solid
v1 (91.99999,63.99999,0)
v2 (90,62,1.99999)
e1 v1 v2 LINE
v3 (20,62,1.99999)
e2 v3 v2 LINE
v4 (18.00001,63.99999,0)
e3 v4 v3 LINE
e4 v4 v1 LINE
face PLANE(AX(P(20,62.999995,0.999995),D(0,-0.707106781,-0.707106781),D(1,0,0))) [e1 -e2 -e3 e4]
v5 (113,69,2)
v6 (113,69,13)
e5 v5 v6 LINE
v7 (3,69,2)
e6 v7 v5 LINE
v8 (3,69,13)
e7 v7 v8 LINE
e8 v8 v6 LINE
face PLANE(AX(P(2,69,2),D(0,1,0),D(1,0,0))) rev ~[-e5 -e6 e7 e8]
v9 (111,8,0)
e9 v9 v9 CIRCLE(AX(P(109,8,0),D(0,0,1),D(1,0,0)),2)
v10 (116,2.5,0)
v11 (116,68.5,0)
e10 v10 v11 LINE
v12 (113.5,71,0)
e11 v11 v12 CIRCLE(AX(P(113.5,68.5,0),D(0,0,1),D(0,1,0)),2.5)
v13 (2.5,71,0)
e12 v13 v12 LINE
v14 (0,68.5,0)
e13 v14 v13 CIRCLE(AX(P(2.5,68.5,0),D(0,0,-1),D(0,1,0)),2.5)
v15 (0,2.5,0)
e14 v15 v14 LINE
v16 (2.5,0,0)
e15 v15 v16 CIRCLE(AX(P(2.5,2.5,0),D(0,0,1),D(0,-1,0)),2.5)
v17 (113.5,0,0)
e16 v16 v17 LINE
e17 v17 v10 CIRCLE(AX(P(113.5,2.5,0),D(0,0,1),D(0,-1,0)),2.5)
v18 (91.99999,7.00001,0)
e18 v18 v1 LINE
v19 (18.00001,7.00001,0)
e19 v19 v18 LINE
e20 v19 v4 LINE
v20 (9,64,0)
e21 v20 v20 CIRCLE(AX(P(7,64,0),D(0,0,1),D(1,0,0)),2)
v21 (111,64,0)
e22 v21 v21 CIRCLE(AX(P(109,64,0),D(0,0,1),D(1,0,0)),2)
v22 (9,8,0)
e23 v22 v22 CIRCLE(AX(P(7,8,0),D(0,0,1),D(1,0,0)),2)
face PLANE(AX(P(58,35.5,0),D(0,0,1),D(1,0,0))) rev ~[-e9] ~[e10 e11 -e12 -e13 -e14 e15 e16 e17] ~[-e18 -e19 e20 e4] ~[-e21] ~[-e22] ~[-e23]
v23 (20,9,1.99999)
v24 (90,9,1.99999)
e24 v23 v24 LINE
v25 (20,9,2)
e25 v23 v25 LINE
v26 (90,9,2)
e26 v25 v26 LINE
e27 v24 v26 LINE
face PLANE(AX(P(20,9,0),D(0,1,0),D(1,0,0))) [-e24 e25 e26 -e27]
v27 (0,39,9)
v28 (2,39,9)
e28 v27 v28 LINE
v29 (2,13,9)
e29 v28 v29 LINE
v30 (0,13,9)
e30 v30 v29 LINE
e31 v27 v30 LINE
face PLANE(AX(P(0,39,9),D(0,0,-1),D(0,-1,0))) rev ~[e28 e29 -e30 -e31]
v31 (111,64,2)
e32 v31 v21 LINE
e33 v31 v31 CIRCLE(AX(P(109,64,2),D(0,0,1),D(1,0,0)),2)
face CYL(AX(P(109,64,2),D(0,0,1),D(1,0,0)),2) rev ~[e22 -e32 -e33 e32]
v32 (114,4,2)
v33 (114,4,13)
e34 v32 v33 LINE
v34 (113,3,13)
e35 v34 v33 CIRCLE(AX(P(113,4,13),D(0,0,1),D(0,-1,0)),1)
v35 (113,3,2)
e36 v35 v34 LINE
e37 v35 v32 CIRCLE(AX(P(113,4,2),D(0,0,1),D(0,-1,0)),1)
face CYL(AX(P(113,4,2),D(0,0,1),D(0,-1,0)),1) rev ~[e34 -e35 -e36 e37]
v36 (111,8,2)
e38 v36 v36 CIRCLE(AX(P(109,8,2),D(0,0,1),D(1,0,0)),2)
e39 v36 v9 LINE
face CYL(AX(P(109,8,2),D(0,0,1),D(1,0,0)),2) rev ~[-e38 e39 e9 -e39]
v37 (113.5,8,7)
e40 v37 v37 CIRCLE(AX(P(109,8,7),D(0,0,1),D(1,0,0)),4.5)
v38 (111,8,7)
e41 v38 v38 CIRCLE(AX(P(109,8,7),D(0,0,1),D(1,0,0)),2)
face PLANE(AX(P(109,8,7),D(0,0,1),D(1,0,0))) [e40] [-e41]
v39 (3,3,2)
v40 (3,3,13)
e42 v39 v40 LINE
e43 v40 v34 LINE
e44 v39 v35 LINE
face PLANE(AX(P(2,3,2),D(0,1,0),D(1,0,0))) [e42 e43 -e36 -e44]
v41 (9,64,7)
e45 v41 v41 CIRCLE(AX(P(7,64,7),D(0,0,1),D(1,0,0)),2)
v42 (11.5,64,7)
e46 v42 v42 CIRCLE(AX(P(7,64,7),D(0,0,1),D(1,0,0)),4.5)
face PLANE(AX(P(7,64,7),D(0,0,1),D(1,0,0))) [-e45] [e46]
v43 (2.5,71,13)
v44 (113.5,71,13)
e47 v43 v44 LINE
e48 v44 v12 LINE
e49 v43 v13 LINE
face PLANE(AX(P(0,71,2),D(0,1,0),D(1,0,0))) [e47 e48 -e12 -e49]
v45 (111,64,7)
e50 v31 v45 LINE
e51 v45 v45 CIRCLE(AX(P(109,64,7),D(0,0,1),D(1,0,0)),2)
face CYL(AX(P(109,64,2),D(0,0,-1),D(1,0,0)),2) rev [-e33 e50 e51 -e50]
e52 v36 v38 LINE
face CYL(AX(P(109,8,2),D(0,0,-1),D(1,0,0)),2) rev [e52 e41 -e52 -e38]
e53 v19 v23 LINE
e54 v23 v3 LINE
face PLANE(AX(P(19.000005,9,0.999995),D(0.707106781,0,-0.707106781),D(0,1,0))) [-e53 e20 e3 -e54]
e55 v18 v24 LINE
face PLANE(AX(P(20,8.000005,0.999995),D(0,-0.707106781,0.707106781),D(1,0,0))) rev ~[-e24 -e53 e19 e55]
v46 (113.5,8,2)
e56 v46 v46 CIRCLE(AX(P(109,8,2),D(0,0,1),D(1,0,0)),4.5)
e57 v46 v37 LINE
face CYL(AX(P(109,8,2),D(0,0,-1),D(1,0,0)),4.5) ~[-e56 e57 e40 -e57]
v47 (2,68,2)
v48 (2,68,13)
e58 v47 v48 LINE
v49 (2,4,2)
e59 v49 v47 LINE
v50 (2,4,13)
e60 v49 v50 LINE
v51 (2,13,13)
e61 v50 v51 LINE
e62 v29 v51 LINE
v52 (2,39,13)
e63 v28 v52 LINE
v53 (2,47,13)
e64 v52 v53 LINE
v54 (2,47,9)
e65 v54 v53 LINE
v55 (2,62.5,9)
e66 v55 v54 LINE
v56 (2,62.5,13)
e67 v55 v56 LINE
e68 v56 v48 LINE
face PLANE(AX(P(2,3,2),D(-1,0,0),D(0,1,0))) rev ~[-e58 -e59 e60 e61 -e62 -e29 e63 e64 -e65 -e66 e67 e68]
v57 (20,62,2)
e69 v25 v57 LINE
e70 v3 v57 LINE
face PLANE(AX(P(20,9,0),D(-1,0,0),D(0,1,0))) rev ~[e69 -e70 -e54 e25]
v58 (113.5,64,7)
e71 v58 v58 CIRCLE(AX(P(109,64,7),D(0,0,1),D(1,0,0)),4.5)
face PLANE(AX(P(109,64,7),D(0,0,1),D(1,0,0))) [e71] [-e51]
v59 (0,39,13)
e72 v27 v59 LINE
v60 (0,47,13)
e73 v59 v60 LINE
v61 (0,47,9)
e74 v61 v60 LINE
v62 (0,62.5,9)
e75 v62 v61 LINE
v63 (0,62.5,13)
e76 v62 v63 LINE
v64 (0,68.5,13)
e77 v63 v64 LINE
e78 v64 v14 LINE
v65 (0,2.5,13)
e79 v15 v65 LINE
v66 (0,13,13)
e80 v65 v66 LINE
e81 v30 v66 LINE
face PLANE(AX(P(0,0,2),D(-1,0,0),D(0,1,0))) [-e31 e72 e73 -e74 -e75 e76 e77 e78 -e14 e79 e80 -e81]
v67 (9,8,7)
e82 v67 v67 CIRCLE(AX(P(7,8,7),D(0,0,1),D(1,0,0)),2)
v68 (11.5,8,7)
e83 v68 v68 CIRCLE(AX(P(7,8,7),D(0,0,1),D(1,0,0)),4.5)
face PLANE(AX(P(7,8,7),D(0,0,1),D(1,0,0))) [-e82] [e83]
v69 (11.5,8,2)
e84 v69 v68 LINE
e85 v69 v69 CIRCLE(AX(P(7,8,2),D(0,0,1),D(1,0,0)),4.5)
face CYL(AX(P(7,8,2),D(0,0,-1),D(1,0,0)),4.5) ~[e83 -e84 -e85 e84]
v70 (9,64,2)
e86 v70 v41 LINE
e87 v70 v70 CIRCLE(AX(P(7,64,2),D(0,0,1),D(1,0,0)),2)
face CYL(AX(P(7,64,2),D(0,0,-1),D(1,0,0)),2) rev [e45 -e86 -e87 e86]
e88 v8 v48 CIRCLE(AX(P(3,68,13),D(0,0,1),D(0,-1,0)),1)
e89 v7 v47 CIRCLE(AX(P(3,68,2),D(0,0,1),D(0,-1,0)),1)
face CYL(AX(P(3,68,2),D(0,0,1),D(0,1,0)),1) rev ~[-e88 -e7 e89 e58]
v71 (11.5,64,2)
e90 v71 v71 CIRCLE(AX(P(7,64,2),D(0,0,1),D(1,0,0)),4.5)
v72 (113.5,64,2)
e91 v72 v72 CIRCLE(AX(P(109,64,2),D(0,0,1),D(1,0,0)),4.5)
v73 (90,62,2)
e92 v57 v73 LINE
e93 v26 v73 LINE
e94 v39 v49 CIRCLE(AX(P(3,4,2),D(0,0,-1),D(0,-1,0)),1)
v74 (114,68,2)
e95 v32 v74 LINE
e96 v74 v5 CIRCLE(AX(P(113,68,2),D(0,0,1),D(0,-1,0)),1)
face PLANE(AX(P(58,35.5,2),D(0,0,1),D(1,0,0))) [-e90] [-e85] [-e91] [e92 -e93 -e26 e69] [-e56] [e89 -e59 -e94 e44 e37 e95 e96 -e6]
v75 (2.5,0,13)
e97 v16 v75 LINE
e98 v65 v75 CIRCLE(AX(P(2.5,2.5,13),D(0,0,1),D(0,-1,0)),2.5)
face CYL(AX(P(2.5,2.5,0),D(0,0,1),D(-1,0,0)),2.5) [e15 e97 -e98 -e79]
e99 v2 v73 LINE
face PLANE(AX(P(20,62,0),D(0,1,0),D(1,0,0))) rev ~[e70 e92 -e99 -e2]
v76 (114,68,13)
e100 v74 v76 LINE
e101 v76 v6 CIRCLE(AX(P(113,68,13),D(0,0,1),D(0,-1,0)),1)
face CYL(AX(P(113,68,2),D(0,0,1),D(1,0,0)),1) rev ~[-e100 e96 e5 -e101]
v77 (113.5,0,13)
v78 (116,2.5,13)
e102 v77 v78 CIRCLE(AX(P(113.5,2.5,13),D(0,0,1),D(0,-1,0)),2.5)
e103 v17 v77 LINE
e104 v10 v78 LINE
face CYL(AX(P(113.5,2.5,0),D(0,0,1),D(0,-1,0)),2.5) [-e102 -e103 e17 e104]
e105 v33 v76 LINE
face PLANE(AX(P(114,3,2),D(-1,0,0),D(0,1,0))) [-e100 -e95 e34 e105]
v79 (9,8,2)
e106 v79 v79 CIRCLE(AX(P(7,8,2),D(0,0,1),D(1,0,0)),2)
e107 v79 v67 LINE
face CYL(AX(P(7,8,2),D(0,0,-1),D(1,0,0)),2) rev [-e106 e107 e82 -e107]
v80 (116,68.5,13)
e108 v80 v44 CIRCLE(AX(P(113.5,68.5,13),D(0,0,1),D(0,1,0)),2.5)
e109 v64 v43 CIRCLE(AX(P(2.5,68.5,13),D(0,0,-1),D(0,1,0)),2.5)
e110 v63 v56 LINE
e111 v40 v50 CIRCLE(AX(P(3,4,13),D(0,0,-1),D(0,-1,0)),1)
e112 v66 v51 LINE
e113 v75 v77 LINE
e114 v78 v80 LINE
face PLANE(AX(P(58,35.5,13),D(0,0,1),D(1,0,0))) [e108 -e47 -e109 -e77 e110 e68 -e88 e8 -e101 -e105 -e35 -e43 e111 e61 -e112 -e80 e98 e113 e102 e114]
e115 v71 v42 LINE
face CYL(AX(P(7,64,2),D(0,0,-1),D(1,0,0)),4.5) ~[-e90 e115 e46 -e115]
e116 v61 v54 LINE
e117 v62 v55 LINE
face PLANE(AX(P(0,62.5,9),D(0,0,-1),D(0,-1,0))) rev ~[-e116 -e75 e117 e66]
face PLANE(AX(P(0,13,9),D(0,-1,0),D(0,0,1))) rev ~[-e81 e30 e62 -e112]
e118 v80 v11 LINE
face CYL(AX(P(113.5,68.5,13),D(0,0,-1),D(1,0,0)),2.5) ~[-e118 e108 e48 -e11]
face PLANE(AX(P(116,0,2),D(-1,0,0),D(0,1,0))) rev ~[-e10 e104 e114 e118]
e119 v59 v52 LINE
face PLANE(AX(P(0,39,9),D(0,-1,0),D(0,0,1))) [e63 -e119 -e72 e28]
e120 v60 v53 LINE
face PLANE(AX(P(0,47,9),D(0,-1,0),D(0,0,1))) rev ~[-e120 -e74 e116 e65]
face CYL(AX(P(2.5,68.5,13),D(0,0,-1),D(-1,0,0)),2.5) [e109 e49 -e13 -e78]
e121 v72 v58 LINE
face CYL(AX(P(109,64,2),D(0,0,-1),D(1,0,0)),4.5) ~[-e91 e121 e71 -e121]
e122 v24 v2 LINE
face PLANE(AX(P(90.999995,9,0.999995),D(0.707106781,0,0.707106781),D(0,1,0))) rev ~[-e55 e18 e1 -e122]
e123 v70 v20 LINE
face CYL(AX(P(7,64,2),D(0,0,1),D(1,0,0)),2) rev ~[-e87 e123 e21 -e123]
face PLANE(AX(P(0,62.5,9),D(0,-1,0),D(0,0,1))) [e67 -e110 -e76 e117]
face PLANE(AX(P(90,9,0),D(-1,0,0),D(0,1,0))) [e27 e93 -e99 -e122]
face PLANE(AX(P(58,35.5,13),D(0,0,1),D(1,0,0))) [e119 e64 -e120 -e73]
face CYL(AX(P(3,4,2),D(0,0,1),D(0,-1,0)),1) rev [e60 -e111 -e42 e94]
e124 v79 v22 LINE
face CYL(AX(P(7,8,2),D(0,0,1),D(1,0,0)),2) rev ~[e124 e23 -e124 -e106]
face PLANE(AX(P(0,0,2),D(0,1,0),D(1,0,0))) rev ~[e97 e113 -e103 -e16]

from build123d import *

# Parameters (mm, degrees)
F0_W      = 116
F0_H      = 71
F0_W_2    = 70
F0_H_2    = 53
F1_DEPTH  = 2
F2_W      = 116
F2_H      = 71
F2_W_2    = 112
F2_H_2    = 66
F3_DEPTH  = 11
F4_R      = 2.5
F5_R      = 1
F6_R      = 4.5
F6_R_2    = 2
F7_DEPTH  = 5
F8_SIZE   = 1.99999
F9_W      = 15.5
F9_H      = 7.5
F9_W_2    = 26
F9_H_2    = 4
F10_DEPTH = 25
F11_DEPTH = 25


# Not quite as in the source:
# - a fillet or chamfer is up to 0.001 mm smaller than in the source, because OpenCascade refuses the exact size


with BuildPart() as f1:
    # F0 (on Top) → F1 (new body)
    with BuildSketch(Plane.XY):
        with Locations((58, 35.5)):
            Rectangle(F0_W, F0_H)
        with Locations((55, 35.5)):
            Rectangle(F0_W_2, F0_H_2, mode=Mode.SUBTRACT)
    extrude(amount=F1_DEPTH)

    # F2 (on face) → F3 (join)
    with BuildSketch(Plane.XY.offset(2)):
        with Locations((58, 35.5)):
            Rectangle(F2_W, F2_H)
        with Locations((58, 36)):
            Rectangle(F2_W_2, F2_H_2, mode=Mode.SUBTRACT)
    extrude(amount=F3_DEPTH)

    # F4
    f4_edges = [f1.edges().sort_by_distance(p)[0] for p in [
        (0, 0, 6.5),
        (116, 0, 6.5),
        (0, 71, 6.5),
        (116, 71, 6.5),
    ]]
    fillet(f4_edges, radius=F4_R)

    # F5
    f5_edges = [f1.edges().sort_by_distance(p)[0] for p in [
        (114, 3, 7.5),
        (2, 3, 7.5),
        (2, 69, 7.5),
        (114, 69, 7.5),
    ]]
    fillet(f5_edges, radius=F5_R)

    # F6 (on face) → F7 (join)
    with BuildSketch(Plane.XY.offset(2)):
        with Locations((7, 64)):
            Circle(F6_R)
        with Locations((7, 64)):
            Circle(F6_R_2, mode=Mode.SUBTRACT)
        with Locations((7, 8)):
            Circle(F6_R)
        with Locations((7, 8)):
            Circle(F6_R_2, mode=Mode.SUBTRACT)
        with Locations((109, 8)):
            Circle(F6_R)
        with Locations((109, 8)):
            Circle(F6_R_2, mode=Mode.SUBTRACT)
        with Locations((109, 64)):
            Circle(F6_R)
        with Locations((109, 64)):
            Circle(F6_R_2, mode=Mode.SUBTRACT)
    extrude(amount=F7_DEPTH)

    # F8 (size 2 in the source; OpenCascade refuses exactly that, so slightly less here)
    f8_edges = [f1.edges().sort_by_distance(p)[0] for p in [
        (90, 35.5, 0),
        (55, 9, 0),
        (20, 35.5, 0),
        (55, 62, 0),
    ]]
    chamfer(f8_edges, length=F8_SIZE)

    # F9 (on face) → F10 (cut)
    with BuildSketch(Plane(origin=(0, 0, 0), x_dir=(0, -1, 0), z_dir=(-1, 0, 0))):
        with Locations((-54.75, 12.75)):
            Rectangle(F9_W, F9_H)
        with Locations((-26, 11)):
            Rectangle(F9_W_2, F9_H_2)
    extrude(amount=-F10_DEPTH, mode=Mode.SUBTRACT)

    # F11 (cut): faces of the model
    f11_faces = [f1.faces().sort_by_distance(p)[0] for p in [
        (7, 8, 2),
        (7, 64, 2),
        (109, 8, 2),
        (109, 64, 2),
    ]]
    extrude(f11_faces, amount=-F11_DEPTH, mode=Mode.SUBTRACT)


solid = f1.part
